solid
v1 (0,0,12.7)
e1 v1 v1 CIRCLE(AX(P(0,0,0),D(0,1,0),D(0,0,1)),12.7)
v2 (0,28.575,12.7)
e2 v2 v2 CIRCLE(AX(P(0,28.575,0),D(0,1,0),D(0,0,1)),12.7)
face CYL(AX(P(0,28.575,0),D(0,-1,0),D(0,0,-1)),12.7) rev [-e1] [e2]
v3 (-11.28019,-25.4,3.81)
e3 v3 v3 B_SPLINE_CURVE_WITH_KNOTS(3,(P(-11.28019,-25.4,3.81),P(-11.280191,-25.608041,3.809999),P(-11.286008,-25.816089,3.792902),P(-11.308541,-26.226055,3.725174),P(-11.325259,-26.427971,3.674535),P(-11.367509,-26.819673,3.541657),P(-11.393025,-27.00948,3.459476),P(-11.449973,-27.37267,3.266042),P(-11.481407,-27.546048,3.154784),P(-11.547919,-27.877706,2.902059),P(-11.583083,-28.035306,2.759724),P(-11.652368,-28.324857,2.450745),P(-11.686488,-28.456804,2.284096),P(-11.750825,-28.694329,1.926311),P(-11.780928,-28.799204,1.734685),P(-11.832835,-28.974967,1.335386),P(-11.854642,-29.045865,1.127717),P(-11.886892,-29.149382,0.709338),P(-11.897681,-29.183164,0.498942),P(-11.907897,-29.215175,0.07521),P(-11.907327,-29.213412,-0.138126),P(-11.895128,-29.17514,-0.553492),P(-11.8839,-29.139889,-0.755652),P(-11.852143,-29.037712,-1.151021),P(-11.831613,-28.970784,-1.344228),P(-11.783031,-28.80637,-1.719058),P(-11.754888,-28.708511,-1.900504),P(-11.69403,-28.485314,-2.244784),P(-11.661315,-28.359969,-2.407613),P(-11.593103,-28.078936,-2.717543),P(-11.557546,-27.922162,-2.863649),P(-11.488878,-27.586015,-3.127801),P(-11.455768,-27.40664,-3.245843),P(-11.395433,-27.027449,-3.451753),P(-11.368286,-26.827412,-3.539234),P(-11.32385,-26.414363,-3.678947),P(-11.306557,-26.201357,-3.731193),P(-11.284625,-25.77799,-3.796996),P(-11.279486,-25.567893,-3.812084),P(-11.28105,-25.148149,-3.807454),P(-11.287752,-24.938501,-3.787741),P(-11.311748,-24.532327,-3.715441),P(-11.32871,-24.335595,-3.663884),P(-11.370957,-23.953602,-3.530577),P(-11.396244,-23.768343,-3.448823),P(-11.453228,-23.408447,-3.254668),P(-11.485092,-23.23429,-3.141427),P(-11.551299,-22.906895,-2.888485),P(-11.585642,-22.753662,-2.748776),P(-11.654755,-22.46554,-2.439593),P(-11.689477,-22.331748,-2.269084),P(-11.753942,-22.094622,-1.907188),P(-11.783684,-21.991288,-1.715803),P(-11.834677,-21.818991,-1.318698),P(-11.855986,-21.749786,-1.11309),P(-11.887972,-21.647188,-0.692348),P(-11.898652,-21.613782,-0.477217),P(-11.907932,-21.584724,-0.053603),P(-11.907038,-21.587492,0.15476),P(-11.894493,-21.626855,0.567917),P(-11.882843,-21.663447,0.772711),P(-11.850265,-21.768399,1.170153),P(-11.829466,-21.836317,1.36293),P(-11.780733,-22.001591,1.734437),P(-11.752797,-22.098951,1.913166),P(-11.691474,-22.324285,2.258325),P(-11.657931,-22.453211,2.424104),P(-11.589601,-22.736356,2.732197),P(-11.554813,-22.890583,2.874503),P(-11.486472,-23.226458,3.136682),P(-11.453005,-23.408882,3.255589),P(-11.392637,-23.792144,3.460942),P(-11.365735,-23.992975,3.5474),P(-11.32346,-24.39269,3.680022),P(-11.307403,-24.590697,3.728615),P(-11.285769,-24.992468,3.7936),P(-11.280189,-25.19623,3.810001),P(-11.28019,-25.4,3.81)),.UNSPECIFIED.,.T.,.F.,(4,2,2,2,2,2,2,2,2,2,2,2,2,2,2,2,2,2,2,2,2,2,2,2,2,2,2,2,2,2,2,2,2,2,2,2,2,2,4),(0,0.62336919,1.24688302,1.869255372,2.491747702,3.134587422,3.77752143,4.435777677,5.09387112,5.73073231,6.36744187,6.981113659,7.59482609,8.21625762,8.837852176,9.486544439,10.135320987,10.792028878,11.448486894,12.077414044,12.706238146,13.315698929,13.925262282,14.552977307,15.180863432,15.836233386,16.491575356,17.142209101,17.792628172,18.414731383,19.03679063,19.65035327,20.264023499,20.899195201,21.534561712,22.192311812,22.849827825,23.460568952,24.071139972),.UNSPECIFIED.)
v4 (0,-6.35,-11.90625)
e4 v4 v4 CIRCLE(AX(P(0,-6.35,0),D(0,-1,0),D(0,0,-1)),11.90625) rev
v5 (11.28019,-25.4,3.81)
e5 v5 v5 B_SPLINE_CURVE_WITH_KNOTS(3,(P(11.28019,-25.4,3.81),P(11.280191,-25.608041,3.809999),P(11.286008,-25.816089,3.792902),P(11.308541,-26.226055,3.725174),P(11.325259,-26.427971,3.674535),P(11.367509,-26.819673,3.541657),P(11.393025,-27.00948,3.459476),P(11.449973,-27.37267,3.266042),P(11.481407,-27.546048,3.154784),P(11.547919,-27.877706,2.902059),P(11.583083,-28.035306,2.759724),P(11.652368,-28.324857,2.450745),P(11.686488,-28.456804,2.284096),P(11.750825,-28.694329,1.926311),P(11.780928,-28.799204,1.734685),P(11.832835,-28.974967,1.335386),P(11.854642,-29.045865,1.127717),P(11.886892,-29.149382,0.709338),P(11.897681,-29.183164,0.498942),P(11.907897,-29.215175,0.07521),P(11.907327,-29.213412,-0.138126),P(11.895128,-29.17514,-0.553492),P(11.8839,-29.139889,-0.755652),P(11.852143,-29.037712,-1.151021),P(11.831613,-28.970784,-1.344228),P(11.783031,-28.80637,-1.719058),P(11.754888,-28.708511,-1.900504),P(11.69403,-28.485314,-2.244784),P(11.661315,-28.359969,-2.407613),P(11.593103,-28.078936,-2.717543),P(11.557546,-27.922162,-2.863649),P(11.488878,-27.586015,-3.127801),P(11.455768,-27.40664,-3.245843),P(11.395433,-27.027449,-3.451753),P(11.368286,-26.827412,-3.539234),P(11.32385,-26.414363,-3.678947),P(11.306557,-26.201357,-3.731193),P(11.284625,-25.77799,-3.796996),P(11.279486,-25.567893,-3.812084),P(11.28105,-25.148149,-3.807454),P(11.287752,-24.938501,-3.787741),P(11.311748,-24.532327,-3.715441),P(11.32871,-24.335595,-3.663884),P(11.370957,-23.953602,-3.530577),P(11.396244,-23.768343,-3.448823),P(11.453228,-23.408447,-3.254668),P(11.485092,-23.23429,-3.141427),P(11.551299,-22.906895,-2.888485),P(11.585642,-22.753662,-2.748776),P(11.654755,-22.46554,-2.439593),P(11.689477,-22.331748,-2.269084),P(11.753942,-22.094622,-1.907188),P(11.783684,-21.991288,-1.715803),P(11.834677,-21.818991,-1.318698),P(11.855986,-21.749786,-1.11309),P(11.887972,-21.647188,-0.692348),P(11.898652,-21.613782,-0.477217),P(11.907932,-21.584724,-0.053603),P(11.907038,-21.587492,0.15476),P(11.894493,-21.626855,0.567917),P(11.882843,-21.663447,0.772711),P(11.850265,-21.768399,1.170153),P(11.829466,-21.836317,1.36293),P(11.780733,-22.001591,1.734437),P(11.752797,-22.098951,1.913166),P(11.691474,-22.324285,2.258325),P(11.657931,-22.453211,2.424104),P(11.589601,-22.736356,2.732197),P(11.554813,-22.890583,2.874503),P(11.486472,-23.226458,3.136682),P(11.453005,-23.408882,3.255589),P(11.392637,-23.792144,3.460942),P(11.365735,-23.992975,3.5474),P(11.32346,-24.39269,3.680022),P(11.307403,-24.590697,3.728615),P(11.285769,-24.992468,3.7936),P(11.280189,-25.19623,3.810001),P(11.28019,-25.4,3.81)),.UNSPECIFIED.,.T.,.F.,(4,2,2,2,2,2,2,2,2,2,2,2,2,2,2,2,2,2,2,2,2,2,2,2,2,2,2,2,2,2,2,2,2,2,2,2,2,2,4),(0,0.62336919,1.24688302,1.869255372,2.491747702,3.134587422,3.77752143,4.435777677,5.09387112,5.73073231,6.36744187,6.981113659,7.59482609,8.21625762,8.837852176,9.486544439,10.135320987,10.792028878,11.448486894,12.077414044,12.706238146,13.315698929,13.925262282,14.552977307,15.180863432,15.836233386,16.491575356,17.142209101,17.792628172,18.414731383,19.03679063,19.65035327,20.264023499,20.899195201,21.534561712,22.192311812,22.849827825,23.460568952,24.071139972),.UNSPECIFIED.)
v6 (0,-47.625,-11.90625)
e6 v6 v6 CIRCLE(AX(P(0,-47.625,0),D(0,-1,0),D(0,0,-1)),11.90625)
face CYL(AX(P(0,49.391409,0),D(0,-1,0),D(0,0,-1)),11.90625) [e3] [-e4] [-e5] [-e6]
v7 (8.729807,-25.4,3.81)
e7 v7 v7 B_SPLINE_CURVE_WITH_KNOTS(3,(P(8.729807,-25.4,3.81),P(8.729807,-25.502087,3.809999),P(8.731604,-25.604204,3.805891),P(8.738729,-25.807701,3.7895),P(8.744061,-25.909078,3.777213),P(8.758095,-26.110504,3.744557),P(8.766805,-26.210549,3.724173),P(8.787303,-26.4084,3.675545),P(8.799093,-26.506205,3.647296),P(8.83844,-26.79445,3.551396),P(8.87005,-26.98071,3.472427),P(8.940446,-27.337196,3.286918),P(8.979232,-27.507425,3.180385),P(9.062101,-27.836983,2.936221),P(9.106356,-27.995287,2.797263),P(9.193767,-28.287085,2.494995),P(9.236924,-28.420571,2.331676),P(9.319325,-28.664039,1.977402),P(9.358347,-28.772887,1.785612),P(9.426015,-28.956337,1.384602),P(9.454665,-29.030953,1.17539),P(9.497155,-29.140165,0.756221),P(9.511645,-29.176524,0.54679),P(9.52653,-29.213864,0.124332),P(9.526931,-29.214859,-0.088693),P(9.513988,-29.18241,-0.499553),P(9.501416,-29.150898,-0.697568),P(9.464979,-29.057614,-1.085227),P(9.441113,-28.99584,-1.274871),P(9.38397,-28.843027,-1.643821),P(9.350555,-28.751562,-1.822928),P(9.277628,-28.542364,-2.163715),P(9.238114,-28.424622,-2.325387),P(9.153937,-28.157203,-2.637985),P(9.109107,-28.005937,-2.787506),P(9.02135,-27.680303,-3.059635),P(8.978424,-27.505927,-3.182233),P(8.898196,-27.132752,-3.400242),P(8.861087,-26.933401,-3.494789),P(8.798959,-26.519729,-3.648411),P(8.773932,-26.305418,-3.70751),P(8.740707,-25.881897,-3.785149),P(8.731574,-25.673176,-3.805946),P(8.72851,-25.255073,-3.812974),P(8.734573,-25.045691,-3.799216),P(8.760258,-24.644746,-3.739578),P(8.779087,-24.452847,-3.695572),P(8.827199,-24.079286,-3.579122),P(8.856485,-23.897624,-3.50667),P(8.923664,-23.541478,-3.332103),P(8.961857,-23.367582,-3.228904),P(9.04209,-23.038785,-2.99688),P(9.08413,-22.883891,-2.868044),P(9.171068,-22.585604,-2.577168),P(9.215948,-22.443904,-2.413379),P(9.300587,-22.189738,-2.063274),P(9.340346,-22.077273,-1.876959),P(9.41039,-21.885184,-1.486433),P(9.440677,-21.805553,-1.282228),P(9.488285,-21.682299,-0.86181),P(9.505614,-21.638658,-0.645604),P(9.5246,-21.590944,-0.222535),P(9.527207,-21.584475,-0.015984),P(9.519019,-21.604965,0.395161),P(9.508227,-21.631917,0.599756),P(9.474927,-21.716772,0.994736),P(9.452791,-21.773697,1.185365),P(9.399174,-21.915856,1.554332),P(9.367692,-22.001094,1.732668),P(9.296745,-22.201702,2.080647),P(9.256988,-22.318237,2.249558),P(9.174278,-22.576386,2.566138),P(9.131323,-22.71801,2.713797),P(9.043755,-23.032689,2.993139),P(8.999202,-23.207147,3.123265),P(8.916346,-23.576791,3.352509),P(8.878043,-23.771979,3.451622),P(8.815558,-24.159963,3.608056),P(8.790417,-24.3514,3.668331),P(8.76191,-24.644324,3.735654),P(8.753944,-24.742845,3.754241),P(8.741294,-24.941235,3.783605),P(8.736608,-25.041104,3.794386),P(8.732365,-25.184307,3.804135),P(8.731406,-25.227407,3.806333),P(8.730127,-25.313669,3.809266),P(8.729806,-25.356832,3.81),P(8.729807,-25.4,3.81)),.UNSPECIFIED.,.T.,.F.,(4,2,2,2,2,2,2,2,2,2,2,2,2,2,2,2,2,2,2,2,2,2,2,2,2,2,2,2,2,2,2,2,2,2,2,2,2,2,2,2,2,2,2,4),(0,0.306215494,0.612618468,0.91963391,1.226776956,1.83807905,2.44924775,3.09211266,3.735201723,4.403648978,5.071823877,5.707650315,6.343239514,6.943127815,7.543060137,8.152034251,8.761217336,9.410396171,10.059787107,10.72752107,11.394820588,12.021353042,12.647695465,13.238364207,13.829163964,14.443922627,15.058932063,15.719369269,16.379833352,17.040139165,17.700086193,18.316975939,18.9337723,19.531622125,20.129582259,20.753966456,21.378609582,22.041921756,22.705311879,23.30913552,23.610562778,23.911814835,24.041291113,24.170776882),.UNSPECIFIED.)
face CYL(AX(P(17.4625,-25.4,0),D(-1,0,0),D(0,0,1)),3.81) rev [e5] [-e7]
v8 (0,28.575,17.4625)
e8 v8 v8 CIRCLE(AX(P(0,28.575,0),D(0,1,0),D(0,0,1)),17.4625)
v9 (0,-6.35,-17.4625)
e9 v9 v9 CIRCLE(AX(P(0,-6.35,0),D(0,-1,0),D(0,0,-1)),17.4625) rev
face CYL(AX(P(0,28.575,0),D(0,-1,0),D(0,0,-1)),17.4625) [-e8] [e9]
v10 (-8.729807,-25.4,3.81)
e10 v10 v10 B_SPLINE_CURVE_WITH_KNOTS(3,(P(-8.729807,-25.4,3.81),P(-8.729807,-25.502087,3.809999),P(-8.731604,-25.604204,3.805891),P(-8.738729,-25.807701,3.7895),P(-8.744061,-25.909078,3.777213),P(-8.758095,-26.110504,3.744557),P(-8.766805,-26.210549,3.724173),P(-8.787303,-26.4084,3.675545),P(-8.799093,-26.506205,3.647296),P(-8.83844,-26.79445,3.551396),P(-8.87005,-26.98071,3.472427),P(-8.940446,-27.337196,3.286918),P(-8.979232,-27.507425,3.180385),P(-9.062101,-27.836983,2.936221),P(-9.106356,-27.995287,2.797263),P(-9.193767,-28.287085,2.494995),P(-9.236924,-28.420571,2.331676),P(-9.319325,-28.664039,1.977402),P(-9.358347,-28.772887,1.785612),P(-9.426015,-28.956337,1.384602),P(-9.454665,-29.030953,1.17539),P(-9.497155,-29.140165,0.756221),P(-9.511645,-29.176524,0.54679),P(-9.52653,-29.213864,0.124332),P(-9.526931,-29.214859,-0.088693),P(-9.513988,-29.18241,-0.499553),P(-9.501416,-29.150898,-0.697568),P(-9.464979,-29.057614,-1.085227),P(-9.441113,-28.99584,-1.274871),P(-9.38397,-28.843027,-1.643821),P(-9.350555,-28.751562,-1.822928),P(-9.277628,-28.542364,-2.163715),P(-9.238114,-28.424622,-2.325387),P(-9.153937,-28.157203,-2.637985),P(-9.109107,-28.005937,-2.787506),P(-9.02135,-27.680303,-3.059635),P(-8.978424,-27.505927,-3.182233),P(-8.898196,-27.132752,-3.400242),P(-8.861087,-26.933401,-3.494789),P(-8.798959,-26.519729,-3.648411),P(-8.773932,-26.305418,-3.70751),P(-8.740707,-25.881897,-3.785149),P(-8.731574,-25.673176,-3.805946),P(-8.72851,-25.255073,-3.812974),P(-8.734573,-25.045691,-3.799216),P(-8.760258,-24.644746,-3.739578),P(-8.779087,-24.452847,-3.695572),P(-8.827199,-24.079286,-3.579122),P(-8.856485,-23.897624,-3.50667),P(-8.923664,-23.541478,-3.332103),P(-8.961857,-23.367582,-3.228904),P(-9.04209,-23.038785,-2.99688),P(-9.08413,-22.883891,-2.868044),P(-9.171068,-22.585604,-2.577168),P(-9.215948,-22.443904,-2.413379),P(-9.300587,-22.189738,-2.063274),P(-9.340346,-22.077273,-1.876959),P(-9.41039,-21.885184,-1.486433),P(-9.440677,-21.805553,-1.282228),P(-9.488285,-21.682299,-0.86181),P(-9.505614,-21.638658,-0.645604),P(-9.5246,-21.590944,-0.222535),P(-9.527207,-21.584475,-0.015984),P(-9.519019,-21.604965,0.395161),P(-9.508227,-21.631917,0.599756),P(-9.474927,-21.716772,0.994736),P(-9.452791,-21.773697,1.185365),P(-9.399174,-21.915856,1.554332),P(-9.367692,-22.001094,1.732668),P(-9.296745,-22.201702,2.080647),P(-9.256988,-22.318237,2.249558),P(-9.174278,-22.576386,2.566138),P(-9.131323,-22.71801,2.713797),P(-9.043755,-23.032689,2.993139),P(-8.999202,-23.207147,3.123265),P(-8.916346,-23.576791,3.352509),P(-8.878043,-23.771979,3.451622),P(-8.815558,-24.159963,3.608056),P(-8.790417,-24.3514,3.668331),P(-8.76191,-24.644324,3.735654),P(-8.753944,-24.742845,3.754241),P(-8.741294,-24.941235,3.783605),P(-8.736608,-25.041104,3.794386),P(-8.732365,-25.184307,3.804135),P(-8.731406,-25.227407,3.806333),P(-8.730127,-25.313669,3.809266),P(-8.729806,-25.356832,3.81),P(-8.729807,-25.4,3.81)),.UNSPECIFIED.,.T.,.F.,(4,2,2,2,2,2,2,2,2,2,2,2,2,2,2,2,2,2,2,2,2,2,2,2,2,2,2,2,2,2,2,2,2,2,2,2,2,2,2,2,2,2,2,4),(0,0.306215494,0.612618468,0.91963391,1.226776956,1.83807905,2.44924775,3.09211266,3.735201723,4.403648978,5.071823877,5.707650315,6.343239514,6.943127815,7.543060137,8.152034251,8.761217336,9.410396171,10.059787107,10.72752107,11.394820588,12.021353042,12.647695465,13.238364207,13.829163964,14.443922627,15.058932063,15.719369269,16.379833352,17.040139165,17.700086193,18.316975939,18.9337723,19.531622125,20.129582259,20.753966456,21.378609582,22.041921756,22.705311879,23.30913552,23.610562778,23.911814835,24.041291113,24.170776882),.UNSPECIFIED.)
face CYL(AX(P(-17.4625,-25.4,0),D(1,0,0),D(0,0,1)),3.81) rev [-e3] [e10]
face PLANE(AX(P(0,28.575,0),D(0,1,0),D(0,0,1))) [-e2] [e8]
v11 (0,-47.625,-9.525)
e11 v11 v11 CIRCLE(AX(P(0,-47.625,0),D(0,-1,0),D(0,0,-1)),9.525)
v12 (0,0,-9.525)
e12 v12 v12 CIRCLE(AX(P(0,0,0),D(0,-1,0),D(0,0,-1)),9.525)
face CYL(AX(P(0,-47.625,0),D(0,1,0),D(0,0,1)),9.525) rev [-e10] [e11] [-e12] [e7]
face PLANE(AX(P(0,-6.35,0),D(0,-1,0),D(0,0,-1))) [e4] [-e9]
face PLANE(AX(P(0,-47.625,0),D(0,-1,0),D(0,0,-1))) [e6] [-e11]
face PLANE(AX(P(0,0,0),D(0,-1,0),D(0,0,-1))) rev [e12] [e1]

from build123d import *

# Parameters (mm, degrees)
SKETCH1_R            = 17.4625
SKETCH1_R_2          = 12.7
SPRING_CHAMBER_DEPTH = 28.575
BALL_CHAMBER_START   = 47.625
SKETCH2_R            = 17.4625
SKETCH2_R_2          = 9.525
BALL_CHAMBER_DEPTH   = 47.625
SKETCH5_R            = 3.81
BALL_HOLE_DEPTH      = 54.647166165
SKETCH8_R            = 17.4625
SKETCH8_R_2          = 11.90625
CUT_EXTRUDE2_DEPTH   = 41.275
SKETCH6_R            = 17.4625
SKETCH6_R_2          = 1.651
BOSS_EXTRUDE4_DEPTH  = 6.35


with BuildPart() as part:
    # Sketch1 → spring_chamber (new body)
    with BuildSketch(Plane(origin=(0, 0, 0), x_dir=(1, 0, 0), z_dir=(0, 1, 0))):
        with Locations(Location((0, 0, 0), (0, 0, 270))):
            Circle(SKETCH1_R)
        with Locations(Location((0, 0, 0), (0, 0, 270))):
            Circle(SKETCH1_R_2, mode=Mode.SUBTRACT)
    extrude(amount=SPRING_CHAMBER_DEPTH)

    # Sketch2 → ball_chamber (add)
    with BuildSketch(Plane.XZ.offset(BALL_CHAMBER_START)):
        with Locations(Location((0, 0, 0), (0, 0, 270))):
            Circle(SKETCH2_R)
        with Locations(Location((0, 0, 0), (0, 0, 270))):
            Circle(SKETCH2_R_2, mode=Mode.SUBTRACT)
    extrude(amount=-BALL_CHAMBER_DEPTH)

    # Sketch5 → ball_hole (cut, through all)
    with BuildSketch(Plane(origin=(0, 0, 0), x_dir=(0, 0, -1), z_dir=(1, 0, 0))):
        with Locations(Location((0, -25.4, 0), (0, 0, 180))):
            Circle(SKETCH5_R)
    ball_hole = extrude(amount=BALL_HOLE_DEPTH, mode=Mode.SUBTRACT)

    # Sketch8 → Cut-Extrude2 (cut)
    with BuildSketch(Plane.XZ.offset(47.625)):
        with Locations(Location((0, 0, 0), (0, 0, 270))):
            Circle(SKETCH8_R)
        with Locations(Location((0, 0, 0), (0, 0, 270))):
            Circle(SKETCH8_R_2, mode=Mode.SUBTRACT)
    extrude(amount=-CUT_EXTRUDE2_DEPTH, mode=Mode.SUBTRACT)

    # Mirror1: ball_hole across plane
    add(ball_hole.mirror(Plane(origin=(0, 0, 0), x_dir=(0, 0, 1), z_dir=(1, 0, 0))), mode=Mode.SUBTRACT)

    # Sketch6 → Boss-Extrude4 (add)
    with BuildSketch(Plane(origin=(0, 28.575, 0), x_dir=(1, 0, 0), z_dir=(0, 1, 0))):
        with BuildLine():
            ThreePointArc((-28.810185185, 6.345643224), (-34.925, 0), (-28.810185185, -6.345643224))
            ThreePointArc((-28.810185185, -6.345643224), (-23.017865483, -7.988458599), (-18.633080808, -12.114409792))
            ThreePointArc((-18.633080808, -12.114409792), (0, -22.225), (18.633080808, -12.114409792))
            ThreePointArc((18.633080808, -12.114409792), (23.017865483, -7.988458599), (28.810185185, -6.345643224))
            ThreePointArc((28.810185185, -6.345643224), (34.925, 0), (28.810185185, 6.345643224))
            ThreePointArc((28.810185185, 6.345643224), (23.017865483, 7.988458599), (18.633080808, 12.114409792))
            ThreePointArc((18.633080808, 12.114409792), (0, 22.225), (-18.633080808, 12.114409792))
            ThreePointArc((-18.633080808, 12.114409792), (-23.017865483, 7.988458599), (-28.810185185, 6.345643224))
        make_face()
        with Locations(Location((0, 0, 0), (0, 0, 90))):
            Circle(SKETCH6_R, mode=Mode.SUBTRACT)
        with Locations((-28.575, 0)):
            Circle(SKETCH6_R_2, mode=Mode.SUBTRACT)
        with Locations((28.575, 0)):
            Circle(SKETCH6_R_2, mode=Mode.SUBTRACT)
    extrude(amount=BOSS_EXTRUDE4_DEPTH)


with BuildPart() as boss_extrude4_kept_piece:
    # of the separate pieces the step leaves, the one the design keeps (boss_extrude4_pieces_kept)
    add(part.part.solids().sort_by_distance((0, 0, 17.4625))[0])


solid = boss_extrude4_kept_piece.part
